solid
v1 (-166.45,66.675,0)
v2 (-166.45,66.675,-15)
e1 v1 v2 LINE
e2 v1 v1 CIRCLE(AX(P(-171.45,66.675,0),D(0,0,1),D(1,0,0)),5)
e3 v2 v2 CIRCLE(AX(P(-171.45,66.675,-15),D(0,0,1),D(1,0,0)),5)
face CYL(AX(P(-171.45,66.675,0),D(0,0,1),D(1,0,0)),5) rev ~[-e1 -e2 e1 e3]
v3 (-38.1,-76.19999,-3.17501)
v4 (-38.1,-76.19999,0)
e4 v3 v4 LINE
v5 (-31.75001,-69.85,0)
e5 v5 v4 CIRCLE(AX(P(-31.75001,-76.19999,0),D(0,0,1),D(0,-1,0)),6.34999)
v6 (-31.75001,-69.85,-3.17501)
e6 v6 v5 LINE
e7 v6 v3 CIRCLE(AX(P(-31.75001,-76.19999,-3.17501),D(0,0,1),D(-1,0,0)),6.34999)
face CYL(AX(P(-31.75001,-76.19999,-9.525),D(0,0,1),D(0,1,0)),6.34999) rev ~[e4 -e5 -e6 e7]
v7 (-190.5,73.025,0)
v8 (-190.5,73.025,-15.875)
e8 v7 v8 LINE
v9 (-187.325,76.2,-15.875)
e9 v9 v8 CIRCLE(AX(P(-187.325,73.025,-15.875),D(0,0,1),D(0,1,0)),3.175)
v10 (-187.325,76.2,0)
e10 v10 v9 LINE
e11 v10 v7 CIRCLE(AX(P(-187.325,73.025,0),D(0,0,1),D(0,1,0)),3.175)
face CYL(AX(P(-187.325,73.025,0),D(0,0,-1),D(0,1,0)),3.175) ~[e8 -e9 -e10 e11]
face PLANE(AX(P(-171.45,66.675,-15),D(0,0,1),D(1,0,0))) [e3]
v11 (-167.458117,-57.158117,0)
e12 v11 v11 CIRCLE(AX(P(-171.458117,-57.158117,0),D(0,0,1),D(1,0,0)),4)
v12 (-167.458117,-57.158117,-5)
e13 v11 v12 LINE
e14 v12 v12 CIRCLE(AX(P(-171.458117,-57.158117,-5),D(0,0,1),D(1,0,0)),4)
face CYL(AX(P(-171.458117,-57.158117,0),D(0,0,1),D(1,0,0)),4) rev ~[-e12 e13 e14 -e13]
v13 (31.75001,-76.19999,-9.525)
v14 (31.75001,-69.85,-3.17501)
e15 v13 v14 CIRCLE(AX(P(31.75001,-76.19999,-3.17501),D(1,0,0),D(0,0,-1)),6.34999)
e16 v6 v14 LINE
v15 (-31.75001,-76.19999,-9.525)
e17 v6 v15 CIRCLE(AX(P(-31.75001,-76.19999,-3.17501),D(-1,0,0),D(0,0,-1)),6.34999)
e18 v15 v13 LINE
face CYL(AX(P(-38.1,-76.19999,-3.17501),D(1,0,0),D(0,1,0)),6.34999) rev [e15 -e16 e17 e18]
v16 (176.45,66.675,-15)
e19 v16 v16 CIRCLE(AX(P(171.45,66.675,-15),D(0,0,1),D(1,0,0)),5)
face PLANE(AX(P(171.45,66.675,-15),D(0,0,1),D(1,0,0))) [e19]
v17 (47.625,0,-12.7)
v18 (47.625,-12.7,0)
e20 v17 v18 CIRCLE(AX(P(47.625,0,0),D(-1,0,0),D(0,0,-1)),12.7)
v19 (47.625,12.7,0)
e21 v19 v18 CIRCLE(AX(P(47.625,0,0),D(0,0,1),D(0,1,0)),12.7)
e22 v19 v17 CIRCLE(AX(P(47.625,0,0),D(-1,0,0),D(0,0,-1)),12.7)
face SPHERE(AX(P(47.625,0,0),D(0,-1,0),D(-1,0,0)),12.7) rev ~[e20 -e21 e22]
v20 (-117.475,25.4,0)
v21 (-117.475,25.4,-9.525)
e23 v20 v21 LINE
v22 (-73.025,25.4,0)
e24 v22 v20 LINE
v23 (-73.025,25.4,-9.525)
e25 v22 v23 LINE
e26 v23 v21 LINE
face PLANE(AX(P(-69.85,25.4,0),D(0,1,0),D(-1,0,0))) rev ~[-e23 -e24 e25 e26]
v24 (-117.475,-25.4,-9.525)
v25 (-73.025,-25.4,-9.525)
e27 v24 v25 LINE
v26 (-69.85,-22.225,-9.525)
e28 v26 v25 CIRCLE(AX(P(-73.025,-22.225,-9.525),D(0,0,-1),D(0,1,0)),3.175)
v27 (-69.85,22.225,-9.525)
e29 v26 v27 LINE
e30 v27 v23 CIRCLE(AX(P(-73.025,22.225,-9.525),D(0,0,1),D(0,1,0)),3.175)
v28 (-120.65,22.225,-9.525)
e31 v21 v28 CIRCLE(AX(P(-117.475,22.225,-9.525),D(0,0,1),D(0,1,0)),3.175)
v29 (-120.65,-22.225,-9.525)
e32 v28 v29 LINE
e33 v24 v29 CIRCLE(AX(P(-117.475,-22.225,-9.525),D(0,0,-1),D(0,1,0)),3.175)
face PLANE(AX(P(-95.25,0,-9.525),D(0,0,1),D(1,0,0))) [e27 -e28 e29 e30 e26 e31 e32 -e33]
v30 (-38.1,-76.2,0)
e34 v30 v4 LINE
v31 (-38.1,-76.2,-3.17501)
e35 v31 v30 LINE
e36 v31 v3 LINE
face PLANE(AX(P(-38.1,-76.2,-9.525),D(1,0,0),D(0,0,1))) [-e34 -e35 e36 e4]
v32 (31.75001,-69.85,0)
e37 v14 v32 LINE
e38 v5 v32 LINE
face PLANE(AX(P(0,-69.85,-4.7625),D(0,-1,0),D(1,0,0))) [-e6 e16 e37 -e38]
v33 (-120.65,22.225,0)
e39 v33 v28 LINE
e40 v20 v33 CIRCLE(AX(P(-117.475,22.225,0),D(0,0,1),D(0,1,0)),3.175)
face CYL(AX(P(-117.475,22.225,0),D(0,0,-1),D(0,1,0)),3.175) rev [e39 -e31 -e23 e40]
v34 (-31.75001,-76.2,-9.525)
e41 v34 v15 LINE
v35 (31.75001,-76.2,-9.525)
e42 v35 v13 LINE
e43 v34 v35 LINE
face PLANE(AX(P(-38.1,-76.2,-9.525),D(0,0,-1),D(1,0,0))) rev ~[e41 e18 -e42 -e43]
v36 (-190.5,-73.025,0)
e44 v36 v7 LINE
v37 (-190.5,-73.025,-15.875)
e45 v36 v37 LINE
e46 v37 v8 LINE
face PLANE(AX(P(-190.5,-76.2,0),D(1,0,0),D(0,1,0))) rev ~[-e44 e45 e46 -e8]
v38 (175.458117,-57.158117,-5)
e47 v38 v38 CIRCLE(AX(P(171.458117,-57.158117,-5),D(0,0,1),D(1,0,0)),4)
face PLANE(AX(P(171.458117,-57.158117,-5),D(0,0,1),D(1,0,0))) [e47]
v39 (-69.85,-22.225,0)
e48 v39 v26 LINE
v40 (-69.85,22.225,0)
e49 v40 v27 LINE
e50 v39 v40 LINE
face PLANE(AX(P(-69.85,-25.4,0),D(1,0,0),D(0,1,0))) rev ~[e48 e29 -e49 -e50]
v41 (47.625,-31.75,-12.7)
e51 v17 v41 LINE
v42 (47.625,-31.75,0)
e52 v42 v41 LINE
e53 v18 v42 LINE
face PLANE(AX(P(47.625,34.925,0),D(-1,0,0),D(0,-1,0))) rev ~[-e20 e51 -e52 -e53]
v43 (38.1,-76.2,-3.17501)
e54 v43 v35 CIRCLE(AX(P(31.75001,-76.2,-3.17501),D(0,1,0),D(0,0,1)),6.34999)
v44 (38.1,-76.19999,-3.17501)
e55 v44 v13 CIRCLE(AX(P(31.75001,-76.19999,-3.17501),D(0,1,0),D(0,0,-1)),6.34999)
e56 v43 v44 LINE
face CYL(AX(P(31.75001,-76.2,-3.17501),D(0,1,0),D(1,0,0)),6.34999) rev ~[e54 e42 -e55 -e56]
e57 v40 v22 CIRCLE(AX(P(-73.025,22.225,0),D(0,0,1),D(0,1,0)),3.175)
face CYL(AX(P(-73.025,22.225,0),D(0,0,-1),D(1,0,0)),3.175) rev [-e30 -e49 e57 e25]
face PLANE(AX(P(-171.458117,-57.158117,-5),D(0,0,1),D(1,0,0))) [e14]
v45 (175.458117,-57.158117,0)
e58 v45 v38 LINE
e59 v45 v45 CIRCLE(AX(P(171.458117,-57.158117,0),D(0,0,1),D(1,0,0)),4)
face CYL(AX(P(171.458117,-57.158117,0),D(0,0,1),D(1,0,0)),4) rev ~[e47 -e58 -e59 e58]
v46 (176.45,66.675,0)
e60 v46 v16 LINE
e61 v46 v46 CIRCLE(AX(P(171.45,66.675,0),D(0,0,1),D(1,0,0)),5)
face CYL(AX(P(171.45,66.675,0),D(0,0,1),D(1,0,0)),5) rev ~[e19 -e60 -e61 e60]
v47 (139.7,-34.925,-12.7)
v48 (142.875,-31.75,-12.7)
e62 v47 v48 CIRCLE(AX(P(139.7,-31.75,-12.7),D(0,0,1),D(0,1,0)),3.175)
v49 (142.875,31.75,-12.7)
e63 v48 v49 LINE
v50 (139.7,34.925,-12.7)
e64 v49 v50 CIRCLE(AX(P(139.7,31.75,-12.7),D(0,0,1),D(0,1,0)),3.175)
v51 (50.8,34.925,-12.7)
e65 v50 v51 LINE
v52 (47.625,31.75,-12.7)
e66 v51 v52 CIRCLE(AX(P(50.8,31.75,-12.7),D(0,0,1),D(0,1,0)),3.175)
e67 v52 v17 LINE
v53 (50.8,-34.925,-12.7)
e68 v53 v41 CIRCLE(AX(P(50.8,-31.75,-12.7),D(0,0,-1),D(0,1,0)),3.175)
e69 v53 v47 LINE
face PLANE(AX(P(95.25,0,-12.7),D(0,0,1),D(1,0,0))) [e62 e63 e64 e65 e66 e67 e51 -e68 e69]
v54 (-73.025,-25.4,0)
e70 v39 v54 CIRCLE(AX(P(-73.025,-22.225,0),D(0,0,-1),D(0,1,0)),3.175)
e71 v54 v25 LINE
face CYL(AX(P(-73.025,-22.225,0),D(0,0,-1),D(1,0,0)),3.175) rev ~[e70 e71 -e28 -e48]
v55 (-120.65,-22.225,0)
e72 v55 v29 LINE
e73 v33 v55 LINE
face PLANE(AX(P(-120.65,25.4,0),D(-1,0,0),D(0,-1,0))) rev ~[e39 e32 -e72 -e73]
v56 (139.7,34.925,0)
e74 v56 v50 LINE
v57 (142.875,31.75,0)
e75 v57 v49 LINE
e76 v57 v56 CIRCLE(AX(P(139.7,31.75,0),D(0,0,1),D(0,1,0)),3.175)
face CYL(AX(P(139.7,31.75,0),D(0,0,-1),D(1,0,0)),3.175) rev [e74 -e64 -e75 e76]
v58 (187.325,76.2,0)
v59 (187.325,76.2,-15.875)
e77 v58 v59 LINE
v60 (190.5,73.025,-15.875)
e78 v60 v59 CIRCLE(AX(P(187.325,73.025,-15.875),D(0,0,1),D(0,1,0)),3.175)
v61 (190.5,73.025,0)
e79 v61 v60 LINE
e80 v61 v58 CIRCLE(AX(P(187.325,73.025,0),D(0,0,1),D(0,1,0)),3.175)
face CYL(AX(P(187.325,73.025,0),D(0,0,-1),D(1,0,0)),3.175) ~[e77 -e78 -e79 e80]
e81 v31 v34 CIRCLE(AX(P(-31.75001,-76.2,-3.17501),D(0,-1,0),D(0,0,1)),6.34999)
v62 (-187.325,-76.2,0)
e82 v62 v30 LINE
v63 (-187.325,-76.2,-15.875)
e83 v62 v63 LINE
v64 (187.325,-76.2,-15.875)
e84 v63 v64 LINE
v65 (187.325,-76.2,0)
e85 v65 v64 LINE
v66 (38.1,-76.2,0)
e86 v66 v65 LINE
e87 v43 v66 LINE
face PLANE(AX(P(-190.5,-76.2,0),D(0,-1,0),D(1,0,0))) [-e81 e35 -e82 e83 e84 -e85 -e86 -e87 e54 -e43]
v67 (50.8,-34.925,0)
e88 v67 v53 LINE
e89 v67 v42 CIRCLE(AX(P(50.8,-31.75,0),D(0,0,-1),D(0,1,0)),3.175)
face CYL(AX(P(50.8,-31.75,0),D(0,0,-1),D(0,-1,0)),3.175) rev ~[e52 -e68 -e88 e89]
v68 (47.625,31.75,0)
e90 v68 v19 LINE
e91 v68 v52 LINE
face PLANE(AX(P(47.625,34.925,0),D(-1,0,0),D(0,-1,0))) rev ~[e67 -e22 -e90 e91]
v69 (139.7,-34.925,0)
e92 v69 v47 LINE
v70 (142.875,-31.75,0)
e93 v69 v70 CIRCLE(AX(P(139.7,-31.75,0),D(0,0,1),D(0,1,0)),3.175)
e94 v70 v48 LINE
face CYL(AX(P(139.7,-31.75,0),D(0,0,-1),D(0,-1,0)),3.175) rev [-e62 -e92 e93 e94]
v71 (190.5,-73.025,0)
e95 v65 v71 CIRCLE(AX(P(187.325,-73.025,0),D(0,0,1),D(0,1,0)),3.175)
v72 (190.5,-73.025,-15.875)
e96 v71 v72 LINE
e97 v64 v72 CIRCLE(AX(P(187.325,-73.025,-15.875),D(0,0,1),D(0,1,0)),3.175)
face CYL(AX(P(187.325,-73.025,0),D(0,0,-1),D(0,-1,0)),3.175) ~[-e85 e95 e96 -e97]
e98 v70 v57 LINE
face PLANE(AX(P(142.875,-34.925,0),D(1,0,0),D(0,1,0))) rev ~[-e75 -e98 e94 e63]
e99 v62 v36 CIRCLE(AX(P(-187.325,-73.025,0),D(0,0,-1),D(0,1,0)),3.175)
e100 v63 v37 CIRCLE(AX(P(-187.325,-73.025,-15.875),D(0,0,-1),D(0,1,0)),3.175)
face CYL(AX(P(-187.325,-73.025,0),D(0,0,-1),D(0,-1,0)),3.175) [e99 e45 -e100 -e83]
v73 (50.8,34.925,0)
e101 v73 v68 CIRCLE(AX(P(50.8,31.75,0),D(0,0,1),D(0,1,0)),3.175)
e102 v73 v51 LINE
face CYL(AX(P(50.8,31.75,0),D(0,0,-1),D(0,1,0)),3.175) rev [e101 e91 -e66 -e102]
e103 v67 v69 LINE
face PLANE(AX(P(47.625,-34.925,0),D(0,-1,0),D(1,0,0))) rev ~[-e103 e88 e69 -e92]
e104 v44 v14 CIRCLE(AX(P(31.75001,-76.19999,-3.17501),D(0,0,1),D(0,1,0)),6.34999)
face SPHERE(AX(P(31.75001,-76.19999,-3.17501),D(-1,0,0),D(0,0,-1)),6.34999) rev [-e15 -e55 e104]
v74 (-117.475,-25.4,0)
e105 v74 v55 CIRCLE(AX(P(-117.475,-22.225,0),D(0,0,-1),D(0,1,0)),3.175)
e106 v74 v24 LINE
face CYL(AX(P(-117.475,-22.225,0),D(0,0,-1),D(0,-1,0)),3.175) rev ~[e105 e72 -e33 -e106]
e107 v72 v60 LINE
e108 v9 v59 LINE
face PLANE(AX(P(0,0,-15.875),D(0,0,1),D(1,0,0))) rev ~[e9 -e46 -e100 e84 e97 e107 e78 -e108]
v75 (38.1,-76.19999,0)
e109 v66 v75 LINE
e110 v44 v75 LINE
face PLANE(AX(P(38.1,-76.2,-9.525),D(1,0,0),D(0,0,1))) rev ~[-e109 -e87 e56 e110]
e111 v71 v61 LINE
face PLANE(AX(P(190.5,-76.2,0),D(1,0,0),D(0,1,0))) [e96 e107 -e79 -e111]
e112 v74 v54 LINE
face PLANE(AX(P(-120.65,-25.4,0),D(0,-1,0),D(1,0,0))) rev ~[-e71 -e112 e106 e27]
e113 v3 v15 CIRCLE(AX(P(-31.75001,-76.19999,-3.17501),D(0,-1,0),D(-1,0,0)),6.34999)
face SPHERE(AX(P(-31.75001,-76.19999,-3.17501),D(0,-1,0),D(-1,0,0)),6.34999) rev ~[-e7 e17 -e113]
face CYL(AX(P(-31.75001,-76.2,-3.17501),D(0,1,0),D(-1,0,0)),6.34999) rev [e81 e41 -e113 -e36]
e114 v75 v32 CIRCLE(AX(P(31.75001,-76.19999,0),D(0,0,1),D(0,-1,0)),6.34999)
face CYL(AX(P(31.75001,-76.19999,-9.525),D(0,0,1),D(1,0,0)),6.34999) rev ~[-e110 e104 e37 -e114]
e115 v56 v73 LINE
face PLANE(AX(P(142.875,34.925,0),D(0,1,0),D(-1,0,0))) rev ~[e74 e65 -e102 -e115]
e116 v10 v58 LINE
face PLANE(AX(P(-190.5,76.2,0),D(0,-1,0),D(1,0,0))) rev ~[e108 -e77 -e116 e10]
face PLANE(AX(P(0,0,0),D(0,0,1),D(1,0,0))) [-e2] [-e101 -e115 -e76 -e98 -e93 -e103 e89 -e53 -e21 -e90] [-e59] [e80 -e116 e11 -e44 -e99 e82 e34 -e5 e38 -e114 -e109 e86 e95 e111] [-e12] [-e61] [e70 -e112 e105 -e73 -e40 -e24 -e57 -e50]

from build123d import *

# Parameters (mm, degrees)
F0_W      = 381
F0_H      = 152.4
F1_DEPTH  = 15.875
F3_DEPTH  = 9.525
F4_DEPTH  = 12.7
F5_R      = 3.175
F6_R      = 4
F7_DEPTH  = 5
F8_W      = 76.2
F8_H      = 9.525
F9_DEPTH  = 6.35
F10_R     = 6.34999
F11_R     = 5
F12_DEPTH = 15
F13_R     = 3.175


# Not quite as in the source:
# - a fillet or chamfer is up to 0.001 mm smaller than in the source, because OpenCascade refuses the exact size
# - ends of sketch curves that miss each other by under 0.0002 mm in the source are joined


with BuildPart() as f1:
    # F0 (on Top) → F1 (new body)
    with BuildSketch(Plane.XY):
        Rectangle(F0_W, F0_H)
    extrude(amount=-F1_DEPTH)

    # F2 (on face) → F3 (cut)
    with BuildSketch(Plane.XY):
        Polygon((-69.85, -25.4), (-69.85, 0), (-69.85, 25.4), (-120.65, 25.4), (-120.65, -25.4), align=None)
    extrude(amount=-F3_DEPTH, mode=Mode.SUBTRACT)

    # F2 (on face) → F4 (cut)
    with BuildSketch(Plane.XY):
        Polygon((47.625, 0), (47.625, -34.925), (142.875, -34.925), (142.875, 34.925), (47.625, 34.925), align=None)
    extrude(amount=-F4_DEPTH, mode=Mode.SUBTRACT)

    # F5
    f5_edges = [f1.edges().sort_by_distance(p)[0] for p in [
        (-69.85, 25.4, -4.7625),
        (142.875, 34.925, -6.35),
        (-69.85, -25.4, -4.7625),
        (142.875, -34.925, -6.35),
        (-120.65, -25.4, -4.7625),
        (47.625, -34.925, -6.35),
        (47.625, 34.925, -6.35),
        (-120.65, 25.4, -4.7625),
    ]]
    fillet(f5_edges, radius=F5_R)

    # F6 (on face) → F7 (cut)
    with BuildSketch(Plane.XY):
        with Locations((-171.4581174665, -57.1581174665)):
            Circle(F6_R)
        with Locations((171.4581174665, -57.1581174665)):
            Circle(F6_R)
    extrude(amount=-F7_DEPTH, mode=Mode.SUBTRACT)

    # F8 (on face) → F9 (cut)
    with BuildSketch(Plane.XZ.offset(76.2)):
        with Locations((0, -4.7625)):
            Rectangle(F8_W, F8_H)
    extrude(amount=-F9_DEPTH, mode=Mode.SUBTRACT)

    # F10 (radius 6.35 in the source; OpenCascade refuses exactly that, so slightly less here)
    f10_edges = [f1.edges().sort_by_distance(p)[0] for p in [
        (-38.1, -73.025, -9.525),
        (-38.1, -69.85, -4.7625),
        (0, -69.85, -9.525),
        (38.1, -73.025, -9.525),
        (38.1, -69.85, -4.7625),
    ]]
    fillet(f10_edges, radius=F10_R)

    # F11 (on face) → F12 (cut)
    with BuildSketch(Plane.XY):
        with Locations((-171.45, 66.675)):
            Circle(F11_R)
        with Locations((171.45, 66.675)):
            Circle(F11_R)
    extrude(amount=-F12_DEPTH, mode=Mode.SUBTRACT)

    # F13
    f13_edges = [f1.edges().sort_by_distance(p)[0] for p in [
        (-190.5, -76.2, -7.9375),
        (190.5, -76.2, -7.9375),
        (190.5, 76.2, -7.9375),
        (-190.5, 76.2, -7.9375),
    ]]
    fillet(f13_edges, radius=F13_R)

    # F14 (on face) → F15 (revolve, cut)
    with BuildSketch(Plane.XY):
        with BuildLine():
            Line((47.625, -12.7), (47.625, 12.7))
            ThreePointArc((47.625, 12.7), (34.925, 1.535e-07), (47.625, -12.7))
        make_face()
    revolve(axis=Axis((47.625, 0, 0), (0, -1, 0)), mode=Mode.SUBTRACT)


solid = f1.part
